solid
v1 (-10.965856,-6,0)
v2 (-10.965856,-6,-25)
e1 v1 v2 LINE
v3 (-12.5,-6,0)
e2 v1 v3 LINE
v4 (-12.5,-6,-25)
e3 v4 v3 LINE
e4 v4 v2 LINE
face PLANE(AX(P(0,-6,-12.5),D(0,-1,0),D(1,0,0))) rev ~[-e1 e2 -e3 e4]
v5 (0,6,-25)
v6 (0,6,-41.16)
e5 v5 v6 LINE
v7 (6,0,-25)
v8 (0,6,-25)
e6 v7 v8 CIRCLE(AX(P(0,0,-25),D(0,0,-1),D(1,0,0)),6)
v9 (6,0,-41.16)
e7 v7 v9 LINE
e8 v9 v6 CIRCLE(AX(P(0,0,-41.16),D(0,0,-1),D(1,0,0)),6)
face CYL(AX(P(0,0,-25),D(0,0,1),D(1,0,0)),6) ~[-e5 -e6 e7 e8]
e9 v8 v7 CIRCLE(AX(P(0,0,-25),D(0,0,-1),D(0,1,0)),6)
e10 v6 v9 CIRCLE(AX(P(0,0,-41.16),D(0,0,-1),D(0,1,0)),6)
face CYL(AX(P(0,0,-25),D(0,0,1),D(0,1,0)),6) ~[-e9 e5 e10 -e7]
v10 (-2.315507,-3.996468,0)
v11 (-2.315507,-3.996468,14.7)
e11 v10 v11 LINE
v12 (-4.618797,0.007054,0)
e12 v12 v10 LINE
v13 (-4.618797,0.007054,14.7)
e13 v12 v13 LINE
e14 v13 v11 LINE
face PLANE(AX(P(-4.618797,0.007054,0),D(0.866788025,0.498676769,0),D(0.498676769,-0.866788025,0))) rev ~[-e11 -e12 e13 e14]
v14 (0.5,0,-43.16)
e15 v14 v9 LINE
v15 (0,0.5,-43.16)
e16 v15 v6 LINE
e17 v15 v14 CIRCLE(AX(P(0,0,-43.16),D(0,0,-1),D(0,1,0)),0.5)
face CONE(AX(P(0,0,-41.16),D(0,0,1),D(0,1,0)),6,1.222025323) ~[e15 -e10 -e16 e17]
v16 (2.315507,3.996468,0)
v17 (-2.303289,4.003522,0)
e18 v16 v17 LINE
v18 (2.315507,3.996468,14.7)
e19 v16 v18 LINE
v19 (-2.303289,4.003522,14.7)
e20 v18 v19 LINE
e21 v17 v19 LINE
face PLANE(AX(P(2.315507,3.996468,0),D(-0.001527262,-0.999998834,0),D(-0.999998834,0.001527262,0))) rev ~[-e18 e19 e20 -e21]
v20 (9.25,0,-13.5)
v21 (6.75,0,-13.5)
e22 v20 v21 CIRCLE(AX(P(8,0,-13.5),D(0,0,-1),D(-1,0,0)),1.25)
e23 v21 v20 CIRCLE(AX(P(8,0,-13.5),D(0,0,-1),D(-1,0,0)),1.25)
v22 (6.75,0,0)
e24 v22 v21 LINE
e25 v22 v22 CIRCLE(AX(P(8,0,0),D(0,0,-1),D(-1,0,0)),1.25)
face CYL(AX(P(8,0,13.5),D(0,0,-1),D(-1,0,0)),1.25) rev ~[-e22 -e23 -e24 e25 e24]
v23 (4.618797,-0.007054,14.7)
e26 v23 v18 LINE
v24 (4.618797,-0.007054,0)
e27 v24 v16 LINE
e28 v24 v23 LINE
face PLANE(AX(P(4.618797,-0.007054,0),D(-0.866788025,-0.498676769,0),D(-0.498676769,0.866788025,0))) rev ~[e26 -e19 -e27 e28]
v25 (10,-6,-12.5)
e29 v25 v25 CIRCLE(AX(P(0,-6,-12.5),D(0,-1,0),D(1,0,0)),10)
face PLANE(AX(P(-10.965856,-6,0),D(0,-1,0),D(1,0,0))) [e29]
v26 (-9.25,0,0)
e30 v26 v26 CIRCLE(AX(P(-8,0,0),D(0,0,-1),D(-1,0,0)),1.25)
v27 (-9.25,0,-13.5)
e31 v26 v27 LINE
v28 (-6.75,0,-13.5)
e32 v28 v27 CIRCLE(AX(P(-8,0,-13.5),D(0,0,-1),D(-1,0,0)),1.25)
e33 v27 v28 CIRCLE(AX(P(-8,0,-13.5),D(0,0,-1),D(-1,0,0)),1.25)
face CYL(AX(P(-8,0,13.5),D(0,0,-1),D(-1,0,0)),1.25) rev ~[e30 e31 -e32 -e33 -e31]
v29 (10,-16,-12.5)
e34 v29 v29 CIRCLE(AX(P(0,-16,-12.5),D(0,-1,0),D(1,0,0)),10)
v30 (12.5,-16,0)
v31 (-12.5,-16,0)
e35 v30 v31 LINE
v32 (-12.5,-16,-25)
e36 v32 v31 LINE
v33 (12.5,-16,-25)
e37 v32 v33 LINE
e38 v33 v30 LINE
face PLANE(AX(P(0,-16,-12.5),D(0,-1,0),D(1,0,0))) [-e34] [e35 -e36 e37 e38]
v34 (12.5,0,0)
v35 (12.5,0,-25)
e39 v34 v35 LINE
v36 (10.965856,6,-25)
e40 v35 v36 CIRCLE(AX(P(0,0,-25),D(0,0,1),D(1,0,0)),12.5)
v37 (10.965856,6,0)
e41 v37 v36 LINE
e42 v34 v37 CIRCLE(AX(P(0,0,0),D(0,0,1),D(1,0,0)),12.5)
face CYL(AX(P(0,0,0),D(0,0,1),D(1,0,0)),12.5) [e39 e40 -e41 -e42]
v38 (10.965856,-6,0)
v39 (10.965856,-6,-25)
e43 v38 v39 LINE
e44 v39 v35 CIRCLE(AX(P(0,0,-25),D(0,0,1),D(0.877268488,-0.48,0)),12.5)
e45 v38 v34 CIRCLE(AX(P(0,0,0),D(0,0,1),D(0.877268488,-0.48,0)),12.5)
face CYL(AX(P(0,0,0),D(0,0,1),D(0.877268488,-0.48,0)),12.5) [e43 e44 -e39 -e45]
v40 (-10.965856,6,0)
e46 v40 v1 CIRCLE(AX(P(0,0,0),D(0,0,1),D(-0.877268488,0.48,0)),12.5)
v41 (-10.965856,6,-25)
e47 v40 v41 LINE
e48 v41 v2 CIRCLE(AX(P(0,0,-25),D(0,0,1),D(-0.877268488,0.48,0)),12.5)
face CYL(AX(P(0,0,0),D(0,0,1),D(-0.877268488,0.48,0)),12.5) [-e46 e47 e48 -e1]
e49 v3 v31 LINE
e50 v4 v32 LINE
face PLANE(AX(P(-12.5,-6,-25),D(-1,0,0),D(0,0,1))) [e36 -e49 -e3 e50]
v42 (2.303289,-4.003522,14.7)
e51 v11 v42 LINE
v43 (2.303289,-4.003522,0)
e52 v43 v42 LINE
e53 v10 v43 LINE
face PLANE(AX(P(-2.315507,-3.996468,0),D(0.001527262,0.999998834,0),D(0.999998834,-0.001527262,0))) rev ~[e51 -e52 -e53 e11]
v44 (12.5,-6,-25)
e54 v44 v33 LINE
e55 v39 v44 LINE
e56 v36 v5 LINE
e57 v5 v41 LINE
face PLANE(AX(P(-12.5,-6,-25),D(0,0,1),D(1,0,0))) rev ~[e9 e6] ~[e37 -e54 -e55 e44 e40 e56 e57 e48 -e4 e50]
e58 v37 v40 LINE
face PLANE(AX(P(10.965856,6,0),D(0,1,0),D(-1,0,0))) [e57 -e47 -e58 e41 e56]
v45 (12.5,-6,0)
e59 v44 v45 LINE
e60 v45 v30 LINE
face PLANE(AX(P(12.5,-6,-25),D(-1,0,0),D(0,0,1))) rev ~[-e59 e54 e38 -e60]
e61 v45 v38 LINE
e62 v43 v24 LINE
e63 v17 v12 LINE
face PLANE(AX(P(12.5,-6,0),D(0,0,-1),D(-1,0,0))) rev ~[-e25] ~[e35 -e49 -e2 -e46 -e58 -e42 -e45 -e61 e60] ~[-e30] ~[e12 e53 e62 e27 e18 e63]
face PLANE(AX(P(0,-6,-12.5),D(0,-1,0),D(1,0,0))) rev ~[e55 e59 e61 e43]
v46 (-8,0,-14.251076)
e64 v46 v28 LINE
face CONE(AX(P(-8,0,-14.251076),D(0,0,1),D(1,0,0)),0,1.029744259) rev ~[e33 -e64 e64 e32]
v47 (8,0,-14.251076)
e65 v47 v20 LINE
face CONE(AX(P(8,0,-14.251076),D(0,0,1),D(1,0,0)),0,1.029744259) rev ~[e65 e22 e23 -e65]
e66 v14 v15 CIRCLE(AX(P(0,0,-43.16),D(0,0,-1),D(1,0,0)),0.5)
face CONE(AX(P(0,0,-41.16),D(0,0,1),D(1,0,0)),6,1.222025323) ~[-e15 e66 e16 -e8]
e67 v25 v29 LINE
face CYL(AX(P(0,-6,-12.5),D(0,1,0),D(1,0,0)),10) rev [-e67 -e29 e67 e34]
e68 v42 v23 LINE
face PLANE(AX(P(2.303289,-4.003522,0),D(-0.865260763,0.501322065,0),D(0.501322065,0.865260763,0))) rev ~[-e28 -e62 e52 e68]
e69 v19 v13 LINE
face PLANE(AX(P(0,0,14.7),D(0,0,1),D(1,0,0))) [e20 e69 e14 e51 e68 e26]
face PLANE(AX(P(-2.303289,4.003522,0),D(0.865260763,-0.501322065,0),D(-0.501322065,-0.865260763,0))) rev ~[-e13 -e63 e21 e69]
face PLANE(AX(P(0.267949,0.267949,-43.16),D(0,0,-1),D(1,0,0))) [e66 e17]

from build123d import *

# Parameters (mm, degrees)
F1_DEPTH  = 25
F3_D      = 2.5
F3_DEPTH  = 13.5
F3_TIP    = 0.7510757738
F4_W      = 21.9317121995
F4_H      = 25
F4_R      = 10
F4_W_2    = 1.5341439003
F5_DEPTH  = 10
F7_DEPTH  = 18.16
F8_SIZE2  = 2
F8_SIZE   = 5.5
F10_DEPTH = 14.7


with BuildPart() as f1:
    # F0 (on Top) → F1 (new body)
    with BuildSketch(Plane.XY):
        with BuildLine():
            ThreePointArc((10.9658560997, -6), (12.1103922572, -3.0965140685), (12.5, 0))
            ThreePointArc((12.5, 0), (12.1103922572, 3.0965140685), (10.9658560997, 6))
            Line((10.9658560997, 6), (-10.9658560997, 6))
            ThreePointArc((-10.9658560997, 6), (-12.5, 0), (-10.9658560997, -6))
            Line((-10.9658560997, -6), (10.9658560997, -6))
        make_face()
    extrude(amount=-F1_DEPTH)

    # F3
    with Locations(Plane.XY):
        with Locations((-8, 0), (8, 0)):
            Hole(F3_D / 2, depth=F3_DEPTH)
            with Locations((0, 0, -(F3_DEPTH + F3_TIP / 2))):  # 118° drill point
                Cone(0, F3_D / 2, F3_TIP, mode=Mode.SUBTRACT)

    # F4 (on face) → F5 (join)
    with BuildSketch(Plane.XZ.offset(6)):
        with Locations((0, -12.5)):
            Rectangle(F4_W, F4_H)
        with Locations((0, -12.5)):
            Circle(F4_R, mode=Mode.SUBTRACT)
        with Locations((-11.7329280499, -12.5)):
            Rectangle(F4_W_2, F4_H)
        with Locations((11.7329280499, -12.5)):
            Rectangle(F4_W_2, F4_H)
    extrude(amount=F5_DEPTH)

    # F6 (on face) → F7 (join)
    with BuildSketch(Plane(origin=(0, 0, -25), x_dir=(1, 0, 0), z_dir=(0, 0, -1))):
        with BuildLine():
            ThreePointArc((0, -6), (4.2426406871, -4.2426406871), (6, 0))
            ThreePointArc((6, 0), (-4.2426406871, 4.2426406871), (0, -6))
        make_face()
    extrude(amount=F7_DEPTH)

    # F8
    f8_edges = [f1.edges().sort_by_distance(p)[0] for p in [
        (0, -6, -43.16),
    ]]
    f8_side = f1.faces().sort_by_distance((0, 0, -43.16))[0]
    chamfer(f8_edges, length=F8_SIZE, length2=F8_SIZE2, reference=f8_side)

    # F9 (on face) → F10 (join)
    with BuildSketch(Plane.XY):
        Polygon((4.6187967668, -0.0070541219), (2.3155074321, 3.996468274), (-2.3032893346, 4.0035223959), (-4.6187967668, 0.0070541219), (-2.3155074321, -3.996468274), (2.3032893346, -4.0035223959), align=None)
    extrude(amount=F10_DEPTH)


solid = f1.part
